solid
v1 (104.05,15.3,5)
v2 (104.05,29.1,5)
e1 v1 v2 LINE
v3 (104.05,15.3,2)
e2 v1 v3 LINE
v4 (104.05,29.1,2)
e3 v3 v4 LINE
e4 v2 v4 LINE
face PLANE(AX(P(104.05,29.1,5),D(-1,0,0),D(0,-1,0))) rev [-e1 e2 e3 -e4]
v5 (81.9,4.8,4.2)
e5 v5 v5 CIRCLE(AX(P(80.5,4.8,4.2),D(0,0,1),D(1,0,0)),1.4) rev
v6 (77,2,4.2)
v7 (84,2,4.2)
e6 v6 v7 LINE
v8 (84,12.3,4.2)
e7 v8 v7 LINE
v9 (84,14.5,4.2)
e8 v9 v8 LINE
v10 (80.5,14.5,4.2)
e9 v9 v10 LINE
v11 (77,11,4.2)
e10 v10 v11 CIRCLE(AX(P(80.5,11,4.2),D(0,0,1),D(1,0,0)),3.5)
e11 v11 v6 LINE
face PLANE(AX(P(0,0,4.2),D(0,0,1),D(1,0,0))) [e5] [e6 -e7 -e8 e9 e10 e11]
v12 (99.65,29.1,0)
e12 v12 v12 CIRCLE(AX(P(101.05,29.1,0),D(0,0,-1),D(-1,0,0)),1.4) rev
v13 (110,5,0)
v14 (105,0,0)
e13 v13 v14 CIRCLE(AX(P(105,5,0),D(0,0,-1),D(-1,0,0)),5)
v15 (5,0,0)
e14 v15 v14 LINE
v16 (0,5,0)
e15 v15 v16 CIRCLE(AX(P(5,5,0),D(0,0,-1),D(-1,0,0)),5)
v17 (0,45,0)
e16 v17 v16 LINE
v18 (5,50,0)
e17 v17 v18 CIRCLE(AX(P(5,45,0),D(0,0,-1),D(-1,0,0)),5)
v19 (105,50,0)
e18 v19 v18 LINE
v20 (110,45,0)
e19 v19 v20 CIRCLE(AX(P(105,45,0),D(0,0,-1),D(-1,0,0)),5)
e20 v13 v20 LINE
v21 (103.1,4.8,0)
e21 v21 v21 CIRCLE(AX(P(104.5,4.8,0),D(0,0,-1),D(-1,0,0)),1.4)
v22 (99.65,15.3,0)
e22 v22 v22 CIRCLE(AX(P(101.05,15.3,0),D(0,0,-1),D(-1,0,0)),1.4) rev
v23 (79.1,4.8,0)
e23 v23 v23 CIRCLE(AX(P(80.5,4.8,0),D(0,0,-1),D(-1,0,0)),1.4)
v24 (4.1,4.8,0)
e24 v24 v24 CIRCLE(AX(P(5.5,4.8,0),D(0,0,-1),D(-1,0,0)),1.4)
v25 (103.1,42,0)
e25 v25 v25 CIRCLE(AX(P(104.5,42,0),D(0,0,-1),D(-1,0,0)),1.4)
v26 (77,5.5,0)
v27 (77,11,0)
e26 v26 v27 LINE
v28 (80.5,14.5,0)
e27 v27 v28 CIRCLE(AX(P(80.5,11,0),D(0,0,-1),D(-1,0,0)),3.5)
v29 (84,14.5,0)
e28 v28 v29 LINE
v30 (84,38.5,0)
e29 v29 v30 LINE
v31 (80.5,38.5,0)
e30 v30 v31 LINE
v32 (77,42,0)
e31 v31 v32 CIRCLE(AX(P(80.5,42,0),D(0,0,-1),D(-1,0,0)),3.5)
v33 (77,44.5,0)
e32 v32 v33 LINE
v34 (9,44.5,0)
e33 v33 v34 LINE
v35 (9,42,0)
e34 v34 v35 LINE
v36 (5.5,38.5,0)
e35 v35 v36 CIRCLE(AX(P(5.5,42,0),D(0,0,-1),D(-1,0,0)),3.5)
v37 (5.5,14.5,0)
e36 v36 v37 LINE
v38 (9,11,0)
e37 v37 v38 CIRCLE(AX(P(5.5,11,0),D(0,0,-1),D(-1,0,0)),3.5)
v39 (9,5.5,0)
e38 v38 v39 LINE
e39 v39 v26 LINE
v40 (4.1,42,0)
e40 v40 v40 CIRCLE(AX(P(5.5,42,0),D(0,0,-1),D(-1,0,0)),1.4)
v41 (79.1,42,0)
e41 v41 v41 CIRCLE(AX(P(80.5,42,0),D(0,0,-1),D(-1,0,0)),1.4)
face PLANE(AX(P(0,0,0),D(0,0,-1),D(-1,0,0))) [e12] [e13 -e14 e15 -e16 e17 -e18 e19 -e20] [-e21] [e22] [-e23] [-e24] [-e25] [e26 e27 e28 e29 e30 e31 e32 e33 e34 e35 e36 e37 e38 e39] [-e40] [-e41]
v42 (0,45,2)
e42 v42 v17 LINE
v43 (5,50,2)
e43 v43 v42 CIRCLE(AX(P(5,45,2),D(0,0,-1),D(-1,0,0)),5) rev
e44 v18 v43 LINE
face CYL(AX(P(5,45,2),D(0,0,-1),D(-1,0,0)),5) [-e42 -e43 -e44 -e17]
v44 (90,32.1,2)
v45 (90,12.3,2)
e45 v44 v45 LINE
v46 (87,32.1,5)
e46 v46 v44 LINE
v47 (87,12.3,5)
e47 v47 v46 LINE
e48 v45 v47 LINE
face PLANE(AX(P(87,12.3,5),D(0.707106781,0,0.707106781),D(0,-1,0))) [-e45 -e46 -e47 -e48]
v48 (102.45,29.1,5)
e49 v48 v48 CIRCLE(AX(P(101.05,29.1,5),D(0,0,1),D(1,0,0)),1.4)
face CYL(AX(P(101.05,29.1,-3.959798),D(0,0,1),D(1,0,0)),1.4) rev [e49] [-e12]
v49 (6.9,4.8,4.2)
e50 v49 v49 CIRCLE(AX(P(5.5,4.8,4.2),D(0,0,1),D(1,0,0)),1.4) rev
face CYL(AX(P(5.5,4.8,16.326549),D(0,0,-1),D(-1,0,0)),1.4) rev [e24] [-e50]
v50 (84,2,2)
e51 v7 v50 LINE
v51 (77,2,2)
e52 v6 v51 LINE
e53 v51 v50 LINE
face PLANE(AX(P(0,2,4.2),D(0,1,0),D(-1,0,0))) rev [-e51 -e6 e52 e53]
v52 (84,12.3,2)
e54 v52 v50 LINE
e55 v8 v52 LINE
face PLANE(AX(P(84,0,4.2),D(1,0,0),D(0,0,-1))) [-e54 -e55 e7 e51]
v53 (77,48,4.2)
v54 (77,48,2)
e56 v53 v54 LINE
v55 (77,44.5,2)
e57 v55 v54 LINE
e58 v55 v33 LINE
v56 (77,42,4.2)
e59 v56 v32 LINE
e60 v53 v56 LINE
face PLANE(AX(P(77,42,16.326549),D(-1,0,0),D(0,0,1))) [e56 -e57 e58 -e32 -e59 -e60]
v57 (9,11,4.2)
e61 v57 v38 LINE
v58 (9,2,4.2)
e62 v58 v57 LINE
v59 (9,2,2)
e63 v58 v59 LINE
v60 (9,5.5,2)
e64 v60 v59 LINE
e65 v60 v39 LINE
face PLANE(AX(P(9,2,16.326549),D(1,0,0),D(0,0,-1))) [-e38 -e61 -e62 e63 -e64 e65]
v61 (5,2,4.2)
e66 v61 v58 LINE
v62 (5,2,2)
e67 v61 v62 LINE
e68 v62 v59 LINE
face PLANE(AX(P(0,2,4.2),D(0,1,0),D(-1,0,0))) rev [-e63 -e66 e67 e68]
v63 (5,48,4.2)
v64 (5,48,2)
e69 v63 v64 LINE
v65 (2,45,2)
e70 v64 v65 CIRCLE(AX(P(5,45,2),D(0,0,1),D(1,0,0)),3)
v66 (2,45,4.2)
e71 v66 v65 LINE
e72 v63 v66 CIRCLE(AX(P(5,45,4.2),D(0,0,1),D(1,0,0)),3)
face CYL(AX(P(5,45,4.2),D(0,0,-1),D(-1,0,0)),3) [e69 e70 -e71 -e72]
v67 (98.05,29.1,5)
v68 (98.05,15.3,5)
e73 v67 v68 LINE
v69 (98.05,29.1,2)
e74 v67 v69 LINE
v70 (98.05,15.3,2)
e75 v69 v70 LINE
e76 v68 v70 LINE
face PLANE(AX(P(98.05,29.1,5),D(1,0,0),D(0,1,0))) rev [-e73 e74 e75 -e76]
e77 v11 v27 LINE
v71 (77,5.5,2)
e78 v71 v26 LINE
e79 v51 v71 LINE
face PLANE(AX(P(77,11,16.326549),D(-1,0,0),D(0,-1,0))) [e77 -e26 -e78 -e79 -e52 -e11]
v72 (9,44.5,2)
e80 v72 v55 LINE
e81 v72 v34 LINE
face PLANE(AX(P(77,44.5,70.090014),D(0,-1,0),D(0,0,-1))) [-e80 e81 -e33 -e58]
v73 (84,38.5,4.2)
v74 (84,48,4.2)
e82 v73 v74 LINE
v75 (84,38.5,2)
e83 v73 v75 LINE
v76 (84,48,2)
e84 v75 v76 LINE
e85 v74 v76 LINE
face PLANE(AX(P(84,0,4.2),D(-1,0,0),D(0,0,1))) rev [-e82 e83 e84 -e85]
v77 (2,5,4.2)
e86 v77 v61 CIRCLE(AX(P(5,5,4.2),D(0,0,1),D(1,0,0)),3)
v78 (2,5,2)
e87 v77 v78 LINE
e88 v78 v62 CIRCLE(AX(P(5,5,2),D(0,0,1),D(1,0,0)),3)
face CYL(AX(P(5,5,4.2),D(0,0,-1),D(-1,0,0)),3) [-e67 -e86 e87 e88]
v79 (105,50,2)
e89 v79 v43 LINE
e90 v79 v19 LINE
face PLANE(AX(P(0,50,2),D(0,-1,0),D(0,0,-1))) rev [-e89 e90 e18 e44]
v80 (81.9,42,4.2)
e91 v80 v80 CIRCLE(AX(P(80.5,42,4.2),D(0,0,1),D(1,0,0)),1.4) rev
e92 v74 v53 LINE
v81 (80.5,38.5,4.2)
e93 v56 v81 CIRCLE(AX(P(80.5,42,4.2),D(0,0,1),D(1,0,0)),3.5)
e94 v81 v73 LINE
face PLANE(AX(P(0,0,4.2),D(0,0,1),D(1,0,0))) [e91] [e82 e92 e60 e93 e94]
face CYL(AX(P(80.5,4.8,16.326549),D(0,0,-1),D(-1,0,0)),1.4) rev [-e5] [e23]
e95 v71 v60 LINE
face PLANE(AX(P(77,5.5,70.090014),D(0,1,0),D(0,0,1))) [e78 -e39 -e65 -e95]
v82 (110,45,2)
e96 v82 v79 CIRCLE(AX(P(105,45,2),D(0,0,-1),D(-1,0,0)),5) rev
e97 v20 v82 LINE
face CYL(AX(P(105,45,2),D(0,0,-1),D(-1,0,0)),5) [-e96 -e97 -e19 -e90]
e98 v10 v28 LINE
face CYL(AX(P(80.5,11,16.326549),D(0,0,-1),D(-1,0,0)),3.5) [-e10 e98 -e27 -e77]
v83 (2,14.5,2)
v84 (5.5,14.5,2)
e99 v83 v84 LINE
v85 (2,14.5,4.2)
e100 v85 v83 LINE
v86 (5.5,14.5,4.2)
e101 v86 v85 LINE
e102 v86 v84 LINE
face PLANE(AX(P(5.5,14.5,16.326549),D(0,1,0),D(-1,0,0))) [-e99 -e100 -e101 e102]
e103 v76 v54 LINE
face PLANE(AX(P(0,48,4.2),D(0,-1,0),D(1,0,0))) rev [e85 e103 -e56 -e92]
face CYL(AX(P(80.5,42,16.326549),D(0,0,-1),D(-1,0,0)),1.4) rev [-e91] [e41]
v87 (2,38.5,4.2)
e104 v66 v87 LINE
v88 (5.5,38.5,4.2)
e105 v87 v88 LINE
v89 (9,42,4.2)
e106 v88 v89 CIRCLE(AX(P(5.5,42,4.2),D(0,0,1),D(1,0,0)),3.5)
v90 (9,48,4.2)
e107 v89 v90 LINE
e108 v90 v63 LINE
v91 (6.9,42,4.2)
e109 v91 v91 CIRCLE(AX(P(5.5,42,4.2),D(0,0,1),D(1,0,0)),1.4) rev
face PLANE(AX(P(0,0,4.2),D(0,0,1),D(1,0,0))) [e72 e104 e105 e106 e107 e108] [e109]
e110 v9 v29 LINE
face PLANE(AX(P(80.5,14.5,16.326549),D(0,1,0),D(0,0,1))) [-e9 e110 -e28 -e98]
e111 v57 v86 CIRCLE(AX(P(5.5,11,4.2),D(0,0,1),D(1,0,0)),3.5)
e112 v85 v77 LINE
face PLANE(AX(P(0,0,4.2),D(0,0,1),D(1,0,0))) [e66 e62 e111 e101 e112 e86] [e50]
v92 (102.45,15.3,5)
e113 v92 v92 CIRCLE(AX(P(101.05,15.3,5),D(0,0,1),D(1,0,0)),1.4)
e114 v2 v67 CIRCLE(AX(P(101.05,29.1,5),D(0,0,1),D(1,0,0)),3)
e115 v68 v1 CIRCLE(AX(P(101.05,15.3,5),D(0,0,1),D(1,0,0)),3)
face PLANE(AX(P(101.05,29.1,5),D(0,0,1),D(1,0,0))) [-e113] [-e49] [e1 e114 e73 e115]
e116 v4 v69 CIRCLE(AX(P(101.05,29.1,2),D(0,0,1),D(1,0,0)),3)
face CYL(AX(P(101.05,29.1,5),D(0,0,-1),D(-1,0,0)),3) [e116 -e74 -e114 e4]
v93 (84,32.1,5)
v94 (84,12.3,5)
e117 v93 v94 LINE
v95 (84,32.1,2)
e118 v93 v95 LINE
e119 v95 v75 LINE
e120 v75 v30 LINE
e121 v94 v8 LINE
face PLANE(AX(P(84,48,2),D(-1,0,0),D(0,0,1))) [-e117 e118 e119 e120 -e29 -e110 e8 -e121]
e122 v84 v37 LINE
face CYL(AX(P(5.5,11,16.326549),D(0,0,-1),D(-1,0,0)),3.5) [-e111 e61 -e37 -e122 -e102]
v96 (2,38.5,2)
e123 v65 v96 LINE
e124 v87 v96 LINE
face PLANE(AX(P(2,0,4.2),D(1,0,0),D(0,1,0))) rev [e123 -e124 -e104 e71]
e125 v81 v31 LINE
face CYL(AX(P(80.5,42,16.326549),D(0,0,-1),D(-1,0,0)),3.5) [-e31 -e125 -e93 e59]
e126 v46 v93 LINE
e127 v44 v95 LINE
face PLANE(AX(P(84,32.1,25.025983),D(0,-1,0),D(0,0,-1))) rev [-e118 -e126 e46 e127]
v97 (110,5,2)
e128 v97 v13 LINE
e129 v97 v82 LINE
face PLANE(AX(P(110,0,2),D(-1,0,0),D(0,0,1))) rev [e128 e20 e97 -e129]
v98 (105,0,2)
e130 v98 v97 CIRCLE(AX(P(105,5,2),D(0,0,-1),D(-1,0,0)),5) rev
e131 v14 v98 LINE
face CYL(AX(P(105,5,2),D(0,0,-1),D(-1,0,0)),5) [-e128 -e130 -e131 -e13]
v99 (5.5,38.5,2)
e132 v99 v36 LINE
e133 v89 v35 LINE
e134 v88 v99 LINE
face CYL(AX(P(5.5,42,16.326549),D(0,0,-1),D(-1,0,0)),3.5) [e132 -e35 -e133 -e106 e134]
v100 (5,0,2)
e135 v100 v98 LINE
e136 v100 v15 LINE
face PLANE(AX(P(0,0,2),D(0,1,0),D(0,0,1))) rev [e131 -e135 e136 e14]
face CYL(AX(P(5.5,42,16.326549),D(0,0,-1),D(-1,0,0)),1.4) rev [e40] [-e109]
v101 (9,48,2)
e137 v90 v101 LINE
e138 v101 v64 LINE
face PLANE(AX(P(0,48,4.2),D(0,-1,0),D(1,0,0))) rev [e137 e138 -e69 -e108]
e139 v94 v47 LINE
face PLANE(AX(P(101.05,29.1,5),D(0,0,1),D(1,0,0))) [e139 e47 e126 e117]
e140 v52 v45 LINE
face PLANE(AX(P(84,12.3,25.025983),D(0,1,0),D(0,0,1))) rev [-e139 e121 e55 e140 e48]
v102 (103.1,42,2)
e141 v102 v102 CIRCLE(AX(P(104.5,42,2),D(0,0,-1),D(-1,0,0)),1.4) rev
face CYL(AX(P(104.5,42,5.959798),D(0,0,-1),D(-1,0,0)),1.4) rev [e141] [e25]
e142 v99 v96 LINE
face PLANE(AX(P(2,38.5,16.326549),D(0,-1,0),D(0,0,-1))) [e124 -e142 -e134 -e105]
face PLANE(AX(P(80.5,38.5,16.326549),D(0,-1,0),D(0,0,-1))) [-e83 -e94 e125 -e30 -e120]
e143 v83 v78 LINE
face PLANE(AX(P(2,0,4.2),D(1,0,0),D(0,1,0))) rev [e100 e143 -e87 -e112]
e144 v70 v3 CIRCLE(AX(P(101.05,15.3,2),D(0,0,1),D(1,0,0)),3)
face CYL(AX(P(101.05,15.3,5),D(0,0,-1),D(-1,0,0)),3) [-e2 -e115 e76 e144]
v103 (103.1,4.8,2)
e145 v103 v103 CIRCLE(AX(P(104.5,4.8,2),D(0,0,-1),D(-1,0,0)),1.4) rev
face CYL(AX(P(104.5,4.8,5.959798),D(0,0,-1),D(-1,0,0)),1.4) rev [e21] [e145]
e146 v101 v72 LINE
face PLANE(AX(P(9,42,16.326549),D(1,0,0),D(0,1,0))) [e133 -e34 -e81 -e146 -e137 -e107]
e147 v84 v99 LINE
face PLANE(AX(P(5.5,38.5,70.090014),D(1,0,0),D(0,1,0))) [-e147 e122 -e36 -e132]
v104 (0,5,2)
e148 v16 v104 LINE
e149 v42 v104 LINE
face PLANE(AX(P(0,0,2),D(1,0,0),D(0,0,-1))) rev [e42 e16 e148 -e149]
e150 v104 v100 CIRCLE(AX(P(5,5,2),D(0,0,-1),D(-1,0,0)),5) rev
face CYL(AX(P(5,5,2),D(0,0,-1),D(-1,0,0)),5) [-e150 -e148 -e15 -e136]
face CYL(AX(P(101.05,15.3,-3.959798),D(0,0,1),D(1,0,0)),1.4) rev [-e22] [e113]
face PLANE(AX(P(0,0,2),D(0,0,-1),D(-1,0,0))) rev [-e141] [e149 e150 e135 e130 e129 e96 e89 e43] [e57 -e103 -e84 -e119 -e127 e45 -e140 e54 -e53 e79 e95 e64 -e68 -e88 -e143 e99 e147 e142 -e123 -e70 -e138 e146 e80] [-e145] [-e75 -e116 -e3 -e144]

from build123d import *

# Parameters (mm, degrees)
SKICA1_W                 = 110
SKICA1_H                 = 50
SKICA1_W_2               = 82
SKICA1_H_2               = 46
P_IDAT_VYSUNUT_M1_DEPTH  = 2
SKICA2_R                 = 1.4
P_IDAT_VYSUNUT_M2_DEPTH  = 2
ZAOBLIT1_R               = 5
SKICA3_R                 = 1.4
ODEBRAT_VYSUNUT_M1_DEPTH = 2
P_IDAT_START             = 3
SKICA4_R                 = 1.4
P_IDAT_VYSUNUT_M3_DEPTH  = 3
SKICA5_R                 = 1.4
P_IDAT_VYSUNUT_M5_DEPTH  = 2.2
SKICA6_R                 = 1.4
ODEBRAT_VYSUNUT_M2_DEPTH = 2
P_IDAT_VYSUNUT_M6_REACH  = 122.868
SKICA8_W                 = 3
SKICA8_H                 = 19.8
ZKOSEN_1_SIZE            = 3
SKICA9_W                 = 68
SKICA9_H                 = 3.5
SKICA9_W_2               = 3.5
SKICA9_H_2               = 24
P_IDAT_VYSUNUT_M7_DEPTH  = 2


with BuildPart() as part:
    # Skica1 → Přidat vysunutím1 (new body)
    with BuildSketch(Plane.XY):
        with Locations((55, 25)):
            Rectangle(SKICA1_W, SKICA1_H)
        with Locations((43, 25)):
            Rectangle(SKICA1_W_2, SKICA1_H_2, mode=Mode.SUBTRACT)
    extrude(amount=P_IDAT_VYSUNUT_M1_DEPTH)

    # Skica2 → Přidat vysunutím2 (add)
    # profile 1 of 4: a face of its own
    with BuildSketch(Plane(origin=(0, 0, 0), x_dir=(-1, 0, 0), z_dir=(0, 0, -1))):
        with BuildLine():
            Line((-77, 42), (-77, 48))
            Line((-77, 48), (-84, 48))
            Line((-84, 48), (-84, 38.5))
            Line((-84, 38.5), (-80.5, 38.5))
            ThreePointArc((-80.5, 38.5), (-78.025126266, 39.525126266), (-77, 42))
        make_face()
        with Locations((-80.5, 42)):
            Circle(SKICA2_R, mode=Mode.SUBTRACT)
    # profile 2 of 4: a face of its own
    with BuildSketch(Plane(origin=(0, 0, 0), x_dir=(-1, 0, 0), z_dir=(0, 0, -1))):
        with BuildLine():
            Line((-9, 42), (-9, 48))
            Line((-9, 48), (-2, 48))
            Line((-2, 48), (-2, 38.5))
            Line((-2, 38.5), (-5.5, 38.5))
            ThreePointArc((-5.5, 38.5), (-7.974873734, 39.525126266), (-9, 42))
        make_face()
        with Locations((-5.5, 42)):
            Circle(SKICA2_R, mode=Mode.SUBTRACT)
    # profile 3 of 4: a face of its own
    with BuildSketch(Plane(origin=(0, 0, 0), x_dir=(-1, 0, 0), z_dir=(0, 0, -1))):
        with BuildLine():
            Line((-80.5, 14.5), (-84, 14.5))
            Line((-84, 14.5), (-84, 2))
            Line((-84, 2), (-77, 2))
            Line((-77, 2), (-77, 11))
            ThreePointArc((-77, 11), (-78.025126266, 13.474873734), (-80.5, 14.5))
        make_face()
        with Locations((-80.5, 4.8)):
            Circle(SKICA2_R, mode=Mode.SUBTRACT)
    # profile 4 of 4: a face of its own
    with BuildSketch(Plane(origin=(0, 0, 0), x_dir=(-1, 0, 0), z_dir=(0, 0, -1))):
        with BuildLine():
            Line((-5.5, 14.5), (-2, 14.5))
            Line((-2, 14.5), (-2, 2))
            Line((-2, 2), (-9, 2))
            Line((-9, 2), (-9, 11))
            ThreePointArc((-9, 11), (-7.974873734, 13.474873734), (-5.5, 14.5))
        make_face()
        with Locations((-5.5, 4.8)):
            Circle(SKICA2_R, mode=Mode.SUBTRACT)
    extrude(amount=-P_IDAT_VYSUNUT_M2_DEPTH)

    # Zaoblit1
    zaoblit1_edges = [part.edges().sort_by_distance(p)[0] for p in [
        (0, 50, 1),
        (110, 50, 1),
        (110, 0, 1),
        (0, 0, 1),
    ]]
    fillet(zaoblit1_edges, radius=ZAOBLIT1_R)

    # Skica3 → Odebrat vysunutím1 (cut)
    with BuildSketch(Plane.XY.offset(2)):
        with Locations((101.05, 29.1)):
            Circle(SKICA3_R)
        with Locations((101.05, 15.3)):
            Circle(SKICA3_R)
    extrude(amount=-ODEBRAT_VYSUNUT_M1_DEPTH, mode=Mode.SUBTRACT)

    # Skica4 → Přidat vysunutím3 (add)
    with BuildSketch(Plane.XY.offset(2).offset(P_IDAT_START)):
        with BuildLine():
            Line((104.05, 29.1), (104.05, 15.3))
            ThreePointArc((104.05, 15.3), (101.05, 12.3), (98.05, 15.3))
            Line((98.05, 15.3), (98.05, 29.1))
            ThreePointArc((98.05, 29.1), (101.05, 32.1), (104.05, 29.1))
        make_face()
        with Locations((101.05, 15.3)):
            Circle(SKICA4_R, mode=Mode.SUBTRACT)
        with Locations((101.05, 29.1)):
            Circle(SKICA4_R, mode=Mode.SUBTRACT)
    extrude(amount=-P_IDAT_VYSUNUT_M3_DEPTH)

    # Skica5 → Přidat vysunutím5 (add)
    # profile 1 of 4: a face of its own
    with BuildSketch(Plane.XY.offset(2)):
        with BuildLine():
            Line((2, 45), (2, 38.5))
            Line((2, 38.5), (5.5, 38.5))
            ThreePointArc((5.5, 38.5), (7.974873734, 39.525126266), (9, 42))
            Line((9, 42), (9, 48))
            Line((9, 48), (5, 48))
            ThreePointArc((5, 48), (2.878679656, 47.121320344), (2, 45))
        make_face()
        with Locations(Location((5.5, 42, 0), (0, 0, 180))):
            Circle(SKICA5_R, mode=Mode.SUBTRACT)
    # profile 2 of 4: a face of its own
    with BuildSketch(Plane.XY.offset(2)):
        with BuildLine():
            Line((5.5, 14.5), (2, 14.5))
            Line((2, 14.5), (2, 5))
            ThreePointArc((2, 5), (2.878679656, 2.878679656), (5, 2))
            Line((5, 2), (9, 2))
            Line((9, 2), (9, 11))
            ThreePointArc((9, 11), (7.974873734, 13.474873734), (5.5, 14.5))
        make_face()
        with Locations(Location((5.5, 4.8, 0), (0, 0, 180))):
            Circle(SKICA5_R, mode=Mode.SUBTRACT)
    # profile 3 of 4: a face of its own
    with BuildSketch(Plane.XY.offset(2)):
        with BuildLine():
            Line((84, 48), (77, 48))
            Line((77, 48), (77, 42))
            ThreePointArc((77, 42), (78.025126266, 39.525126266), (80.5, 38.5))
            Line((80.5, 38.5), (84, 38.5))
            Line((84, 38.5), (84, 48))
        make_face()
        with Locations(Location((80.5, 42, 0), (0, 0, 180))):
            Circle(SKICA5_R, mode=Mode.SUBTRACT)
    # profile 4 of 4: a face of its own
    with BuildSketch(Plane.XY.offset(2)):
        with BuildLine():
            Line((77, 11), (77, 2))
            Line((77, 2), (84, 2))
            Line((84, 2), (84, 14.5))
            Line((84, 14.5), (80.5, 14.5))
            ThreePointArc((80.5, 14.5), (78.025126266, 13.474873734), (77, 11))
        make_face()
        with Locations(Location((80.5, 4.8, 0), (0, 0, 180))):
            Circle(SKICA5_R, mode=Mode.SUBTRACT)
    extrude(amount=P_IDAT_VYSUNUT_M5_DEPTH)

    # Skica6 → Odebrat vysunutím2 (cut)
    with BuildSketch(Plane(origin=(0, 0, 0), x_dir=(-1, 0, 0), z_dir=(0, 0, -1))):
        with Locations((-104.5, 42)):
            Circle(SKICA6_R)
        with Locations((-104.5, 4.8)):
            Circle(SKICA6_R)
    extrude(amount=-ODEBRAT_VYSUNUT_M2_DEPTH, mode=Mode.SUBTRACT)

    # Přidat vysunutím6: up to this face of the body (flat: up to its plane)
    p_idat_vysunut_m6_end = Plane(part.part.faces().sort_by_distance((101.05, 22.2, 5))[0])
    # Skica8 → Přidat vysunutím6 (add, up to the picked face)
    with BuildSketch(Plane.XY.offset(2), mode=Mode.PRIVATE) as p_idat_vysunut_m6_sk1:
        with Locations((85.5, 22.2)):
            Rectangle(SKICA8_W, SKICA8_H)
    p_idat_vysunut_m6_tool1 = split(extrude(p_idat_vysunut_m6_sk1.sketch, amount=P_IDAT_VYSUNUT_M6_REACH, mode=Mode.PRIVATE), bisect_by=p_idat_vysunut_m6_end, keep=Keep.BOTH, mode=Mode.PRIVATE)
    add(p_idat_vysunut_m6_tool1.solids().sort_by(Axis((85.5, 22.2, 2), (0, 0, 1)))[0])

    # Zkosení1
    zkosen_1_edges = [part.edges().sort_by_distance(p)[0] for p in [
        (87, 22.2, 2),
    ]]
    chamfer(zkosen_1_edges, length=ZKOSEN_1_SIZE - 0.0001)  # a hair under: the kernel refuses the full size

    # Skica9 → Přidat vysunutím7 (add)
    with BuildSketch(Plane(origin=(0, 0, 0), x_dir=(-1, 0, 0), z_dir=(0, 0, -1))):
        with Locations((-43, 3.75)):
            Rectangle(SKICA9_W, SKICA9_H)
        with Locations((-43, 46.25)):
            Rectangle(SKICA9_W, SKICA9_H)
        with Locations((-3.75, 26.5)):
            Rectangle(SKICA9_W_2, SKICA9_H_2)
    extrude(amount=-P_IDAT_VYSUNUT_M7_DEPTH)


solid = part.part
